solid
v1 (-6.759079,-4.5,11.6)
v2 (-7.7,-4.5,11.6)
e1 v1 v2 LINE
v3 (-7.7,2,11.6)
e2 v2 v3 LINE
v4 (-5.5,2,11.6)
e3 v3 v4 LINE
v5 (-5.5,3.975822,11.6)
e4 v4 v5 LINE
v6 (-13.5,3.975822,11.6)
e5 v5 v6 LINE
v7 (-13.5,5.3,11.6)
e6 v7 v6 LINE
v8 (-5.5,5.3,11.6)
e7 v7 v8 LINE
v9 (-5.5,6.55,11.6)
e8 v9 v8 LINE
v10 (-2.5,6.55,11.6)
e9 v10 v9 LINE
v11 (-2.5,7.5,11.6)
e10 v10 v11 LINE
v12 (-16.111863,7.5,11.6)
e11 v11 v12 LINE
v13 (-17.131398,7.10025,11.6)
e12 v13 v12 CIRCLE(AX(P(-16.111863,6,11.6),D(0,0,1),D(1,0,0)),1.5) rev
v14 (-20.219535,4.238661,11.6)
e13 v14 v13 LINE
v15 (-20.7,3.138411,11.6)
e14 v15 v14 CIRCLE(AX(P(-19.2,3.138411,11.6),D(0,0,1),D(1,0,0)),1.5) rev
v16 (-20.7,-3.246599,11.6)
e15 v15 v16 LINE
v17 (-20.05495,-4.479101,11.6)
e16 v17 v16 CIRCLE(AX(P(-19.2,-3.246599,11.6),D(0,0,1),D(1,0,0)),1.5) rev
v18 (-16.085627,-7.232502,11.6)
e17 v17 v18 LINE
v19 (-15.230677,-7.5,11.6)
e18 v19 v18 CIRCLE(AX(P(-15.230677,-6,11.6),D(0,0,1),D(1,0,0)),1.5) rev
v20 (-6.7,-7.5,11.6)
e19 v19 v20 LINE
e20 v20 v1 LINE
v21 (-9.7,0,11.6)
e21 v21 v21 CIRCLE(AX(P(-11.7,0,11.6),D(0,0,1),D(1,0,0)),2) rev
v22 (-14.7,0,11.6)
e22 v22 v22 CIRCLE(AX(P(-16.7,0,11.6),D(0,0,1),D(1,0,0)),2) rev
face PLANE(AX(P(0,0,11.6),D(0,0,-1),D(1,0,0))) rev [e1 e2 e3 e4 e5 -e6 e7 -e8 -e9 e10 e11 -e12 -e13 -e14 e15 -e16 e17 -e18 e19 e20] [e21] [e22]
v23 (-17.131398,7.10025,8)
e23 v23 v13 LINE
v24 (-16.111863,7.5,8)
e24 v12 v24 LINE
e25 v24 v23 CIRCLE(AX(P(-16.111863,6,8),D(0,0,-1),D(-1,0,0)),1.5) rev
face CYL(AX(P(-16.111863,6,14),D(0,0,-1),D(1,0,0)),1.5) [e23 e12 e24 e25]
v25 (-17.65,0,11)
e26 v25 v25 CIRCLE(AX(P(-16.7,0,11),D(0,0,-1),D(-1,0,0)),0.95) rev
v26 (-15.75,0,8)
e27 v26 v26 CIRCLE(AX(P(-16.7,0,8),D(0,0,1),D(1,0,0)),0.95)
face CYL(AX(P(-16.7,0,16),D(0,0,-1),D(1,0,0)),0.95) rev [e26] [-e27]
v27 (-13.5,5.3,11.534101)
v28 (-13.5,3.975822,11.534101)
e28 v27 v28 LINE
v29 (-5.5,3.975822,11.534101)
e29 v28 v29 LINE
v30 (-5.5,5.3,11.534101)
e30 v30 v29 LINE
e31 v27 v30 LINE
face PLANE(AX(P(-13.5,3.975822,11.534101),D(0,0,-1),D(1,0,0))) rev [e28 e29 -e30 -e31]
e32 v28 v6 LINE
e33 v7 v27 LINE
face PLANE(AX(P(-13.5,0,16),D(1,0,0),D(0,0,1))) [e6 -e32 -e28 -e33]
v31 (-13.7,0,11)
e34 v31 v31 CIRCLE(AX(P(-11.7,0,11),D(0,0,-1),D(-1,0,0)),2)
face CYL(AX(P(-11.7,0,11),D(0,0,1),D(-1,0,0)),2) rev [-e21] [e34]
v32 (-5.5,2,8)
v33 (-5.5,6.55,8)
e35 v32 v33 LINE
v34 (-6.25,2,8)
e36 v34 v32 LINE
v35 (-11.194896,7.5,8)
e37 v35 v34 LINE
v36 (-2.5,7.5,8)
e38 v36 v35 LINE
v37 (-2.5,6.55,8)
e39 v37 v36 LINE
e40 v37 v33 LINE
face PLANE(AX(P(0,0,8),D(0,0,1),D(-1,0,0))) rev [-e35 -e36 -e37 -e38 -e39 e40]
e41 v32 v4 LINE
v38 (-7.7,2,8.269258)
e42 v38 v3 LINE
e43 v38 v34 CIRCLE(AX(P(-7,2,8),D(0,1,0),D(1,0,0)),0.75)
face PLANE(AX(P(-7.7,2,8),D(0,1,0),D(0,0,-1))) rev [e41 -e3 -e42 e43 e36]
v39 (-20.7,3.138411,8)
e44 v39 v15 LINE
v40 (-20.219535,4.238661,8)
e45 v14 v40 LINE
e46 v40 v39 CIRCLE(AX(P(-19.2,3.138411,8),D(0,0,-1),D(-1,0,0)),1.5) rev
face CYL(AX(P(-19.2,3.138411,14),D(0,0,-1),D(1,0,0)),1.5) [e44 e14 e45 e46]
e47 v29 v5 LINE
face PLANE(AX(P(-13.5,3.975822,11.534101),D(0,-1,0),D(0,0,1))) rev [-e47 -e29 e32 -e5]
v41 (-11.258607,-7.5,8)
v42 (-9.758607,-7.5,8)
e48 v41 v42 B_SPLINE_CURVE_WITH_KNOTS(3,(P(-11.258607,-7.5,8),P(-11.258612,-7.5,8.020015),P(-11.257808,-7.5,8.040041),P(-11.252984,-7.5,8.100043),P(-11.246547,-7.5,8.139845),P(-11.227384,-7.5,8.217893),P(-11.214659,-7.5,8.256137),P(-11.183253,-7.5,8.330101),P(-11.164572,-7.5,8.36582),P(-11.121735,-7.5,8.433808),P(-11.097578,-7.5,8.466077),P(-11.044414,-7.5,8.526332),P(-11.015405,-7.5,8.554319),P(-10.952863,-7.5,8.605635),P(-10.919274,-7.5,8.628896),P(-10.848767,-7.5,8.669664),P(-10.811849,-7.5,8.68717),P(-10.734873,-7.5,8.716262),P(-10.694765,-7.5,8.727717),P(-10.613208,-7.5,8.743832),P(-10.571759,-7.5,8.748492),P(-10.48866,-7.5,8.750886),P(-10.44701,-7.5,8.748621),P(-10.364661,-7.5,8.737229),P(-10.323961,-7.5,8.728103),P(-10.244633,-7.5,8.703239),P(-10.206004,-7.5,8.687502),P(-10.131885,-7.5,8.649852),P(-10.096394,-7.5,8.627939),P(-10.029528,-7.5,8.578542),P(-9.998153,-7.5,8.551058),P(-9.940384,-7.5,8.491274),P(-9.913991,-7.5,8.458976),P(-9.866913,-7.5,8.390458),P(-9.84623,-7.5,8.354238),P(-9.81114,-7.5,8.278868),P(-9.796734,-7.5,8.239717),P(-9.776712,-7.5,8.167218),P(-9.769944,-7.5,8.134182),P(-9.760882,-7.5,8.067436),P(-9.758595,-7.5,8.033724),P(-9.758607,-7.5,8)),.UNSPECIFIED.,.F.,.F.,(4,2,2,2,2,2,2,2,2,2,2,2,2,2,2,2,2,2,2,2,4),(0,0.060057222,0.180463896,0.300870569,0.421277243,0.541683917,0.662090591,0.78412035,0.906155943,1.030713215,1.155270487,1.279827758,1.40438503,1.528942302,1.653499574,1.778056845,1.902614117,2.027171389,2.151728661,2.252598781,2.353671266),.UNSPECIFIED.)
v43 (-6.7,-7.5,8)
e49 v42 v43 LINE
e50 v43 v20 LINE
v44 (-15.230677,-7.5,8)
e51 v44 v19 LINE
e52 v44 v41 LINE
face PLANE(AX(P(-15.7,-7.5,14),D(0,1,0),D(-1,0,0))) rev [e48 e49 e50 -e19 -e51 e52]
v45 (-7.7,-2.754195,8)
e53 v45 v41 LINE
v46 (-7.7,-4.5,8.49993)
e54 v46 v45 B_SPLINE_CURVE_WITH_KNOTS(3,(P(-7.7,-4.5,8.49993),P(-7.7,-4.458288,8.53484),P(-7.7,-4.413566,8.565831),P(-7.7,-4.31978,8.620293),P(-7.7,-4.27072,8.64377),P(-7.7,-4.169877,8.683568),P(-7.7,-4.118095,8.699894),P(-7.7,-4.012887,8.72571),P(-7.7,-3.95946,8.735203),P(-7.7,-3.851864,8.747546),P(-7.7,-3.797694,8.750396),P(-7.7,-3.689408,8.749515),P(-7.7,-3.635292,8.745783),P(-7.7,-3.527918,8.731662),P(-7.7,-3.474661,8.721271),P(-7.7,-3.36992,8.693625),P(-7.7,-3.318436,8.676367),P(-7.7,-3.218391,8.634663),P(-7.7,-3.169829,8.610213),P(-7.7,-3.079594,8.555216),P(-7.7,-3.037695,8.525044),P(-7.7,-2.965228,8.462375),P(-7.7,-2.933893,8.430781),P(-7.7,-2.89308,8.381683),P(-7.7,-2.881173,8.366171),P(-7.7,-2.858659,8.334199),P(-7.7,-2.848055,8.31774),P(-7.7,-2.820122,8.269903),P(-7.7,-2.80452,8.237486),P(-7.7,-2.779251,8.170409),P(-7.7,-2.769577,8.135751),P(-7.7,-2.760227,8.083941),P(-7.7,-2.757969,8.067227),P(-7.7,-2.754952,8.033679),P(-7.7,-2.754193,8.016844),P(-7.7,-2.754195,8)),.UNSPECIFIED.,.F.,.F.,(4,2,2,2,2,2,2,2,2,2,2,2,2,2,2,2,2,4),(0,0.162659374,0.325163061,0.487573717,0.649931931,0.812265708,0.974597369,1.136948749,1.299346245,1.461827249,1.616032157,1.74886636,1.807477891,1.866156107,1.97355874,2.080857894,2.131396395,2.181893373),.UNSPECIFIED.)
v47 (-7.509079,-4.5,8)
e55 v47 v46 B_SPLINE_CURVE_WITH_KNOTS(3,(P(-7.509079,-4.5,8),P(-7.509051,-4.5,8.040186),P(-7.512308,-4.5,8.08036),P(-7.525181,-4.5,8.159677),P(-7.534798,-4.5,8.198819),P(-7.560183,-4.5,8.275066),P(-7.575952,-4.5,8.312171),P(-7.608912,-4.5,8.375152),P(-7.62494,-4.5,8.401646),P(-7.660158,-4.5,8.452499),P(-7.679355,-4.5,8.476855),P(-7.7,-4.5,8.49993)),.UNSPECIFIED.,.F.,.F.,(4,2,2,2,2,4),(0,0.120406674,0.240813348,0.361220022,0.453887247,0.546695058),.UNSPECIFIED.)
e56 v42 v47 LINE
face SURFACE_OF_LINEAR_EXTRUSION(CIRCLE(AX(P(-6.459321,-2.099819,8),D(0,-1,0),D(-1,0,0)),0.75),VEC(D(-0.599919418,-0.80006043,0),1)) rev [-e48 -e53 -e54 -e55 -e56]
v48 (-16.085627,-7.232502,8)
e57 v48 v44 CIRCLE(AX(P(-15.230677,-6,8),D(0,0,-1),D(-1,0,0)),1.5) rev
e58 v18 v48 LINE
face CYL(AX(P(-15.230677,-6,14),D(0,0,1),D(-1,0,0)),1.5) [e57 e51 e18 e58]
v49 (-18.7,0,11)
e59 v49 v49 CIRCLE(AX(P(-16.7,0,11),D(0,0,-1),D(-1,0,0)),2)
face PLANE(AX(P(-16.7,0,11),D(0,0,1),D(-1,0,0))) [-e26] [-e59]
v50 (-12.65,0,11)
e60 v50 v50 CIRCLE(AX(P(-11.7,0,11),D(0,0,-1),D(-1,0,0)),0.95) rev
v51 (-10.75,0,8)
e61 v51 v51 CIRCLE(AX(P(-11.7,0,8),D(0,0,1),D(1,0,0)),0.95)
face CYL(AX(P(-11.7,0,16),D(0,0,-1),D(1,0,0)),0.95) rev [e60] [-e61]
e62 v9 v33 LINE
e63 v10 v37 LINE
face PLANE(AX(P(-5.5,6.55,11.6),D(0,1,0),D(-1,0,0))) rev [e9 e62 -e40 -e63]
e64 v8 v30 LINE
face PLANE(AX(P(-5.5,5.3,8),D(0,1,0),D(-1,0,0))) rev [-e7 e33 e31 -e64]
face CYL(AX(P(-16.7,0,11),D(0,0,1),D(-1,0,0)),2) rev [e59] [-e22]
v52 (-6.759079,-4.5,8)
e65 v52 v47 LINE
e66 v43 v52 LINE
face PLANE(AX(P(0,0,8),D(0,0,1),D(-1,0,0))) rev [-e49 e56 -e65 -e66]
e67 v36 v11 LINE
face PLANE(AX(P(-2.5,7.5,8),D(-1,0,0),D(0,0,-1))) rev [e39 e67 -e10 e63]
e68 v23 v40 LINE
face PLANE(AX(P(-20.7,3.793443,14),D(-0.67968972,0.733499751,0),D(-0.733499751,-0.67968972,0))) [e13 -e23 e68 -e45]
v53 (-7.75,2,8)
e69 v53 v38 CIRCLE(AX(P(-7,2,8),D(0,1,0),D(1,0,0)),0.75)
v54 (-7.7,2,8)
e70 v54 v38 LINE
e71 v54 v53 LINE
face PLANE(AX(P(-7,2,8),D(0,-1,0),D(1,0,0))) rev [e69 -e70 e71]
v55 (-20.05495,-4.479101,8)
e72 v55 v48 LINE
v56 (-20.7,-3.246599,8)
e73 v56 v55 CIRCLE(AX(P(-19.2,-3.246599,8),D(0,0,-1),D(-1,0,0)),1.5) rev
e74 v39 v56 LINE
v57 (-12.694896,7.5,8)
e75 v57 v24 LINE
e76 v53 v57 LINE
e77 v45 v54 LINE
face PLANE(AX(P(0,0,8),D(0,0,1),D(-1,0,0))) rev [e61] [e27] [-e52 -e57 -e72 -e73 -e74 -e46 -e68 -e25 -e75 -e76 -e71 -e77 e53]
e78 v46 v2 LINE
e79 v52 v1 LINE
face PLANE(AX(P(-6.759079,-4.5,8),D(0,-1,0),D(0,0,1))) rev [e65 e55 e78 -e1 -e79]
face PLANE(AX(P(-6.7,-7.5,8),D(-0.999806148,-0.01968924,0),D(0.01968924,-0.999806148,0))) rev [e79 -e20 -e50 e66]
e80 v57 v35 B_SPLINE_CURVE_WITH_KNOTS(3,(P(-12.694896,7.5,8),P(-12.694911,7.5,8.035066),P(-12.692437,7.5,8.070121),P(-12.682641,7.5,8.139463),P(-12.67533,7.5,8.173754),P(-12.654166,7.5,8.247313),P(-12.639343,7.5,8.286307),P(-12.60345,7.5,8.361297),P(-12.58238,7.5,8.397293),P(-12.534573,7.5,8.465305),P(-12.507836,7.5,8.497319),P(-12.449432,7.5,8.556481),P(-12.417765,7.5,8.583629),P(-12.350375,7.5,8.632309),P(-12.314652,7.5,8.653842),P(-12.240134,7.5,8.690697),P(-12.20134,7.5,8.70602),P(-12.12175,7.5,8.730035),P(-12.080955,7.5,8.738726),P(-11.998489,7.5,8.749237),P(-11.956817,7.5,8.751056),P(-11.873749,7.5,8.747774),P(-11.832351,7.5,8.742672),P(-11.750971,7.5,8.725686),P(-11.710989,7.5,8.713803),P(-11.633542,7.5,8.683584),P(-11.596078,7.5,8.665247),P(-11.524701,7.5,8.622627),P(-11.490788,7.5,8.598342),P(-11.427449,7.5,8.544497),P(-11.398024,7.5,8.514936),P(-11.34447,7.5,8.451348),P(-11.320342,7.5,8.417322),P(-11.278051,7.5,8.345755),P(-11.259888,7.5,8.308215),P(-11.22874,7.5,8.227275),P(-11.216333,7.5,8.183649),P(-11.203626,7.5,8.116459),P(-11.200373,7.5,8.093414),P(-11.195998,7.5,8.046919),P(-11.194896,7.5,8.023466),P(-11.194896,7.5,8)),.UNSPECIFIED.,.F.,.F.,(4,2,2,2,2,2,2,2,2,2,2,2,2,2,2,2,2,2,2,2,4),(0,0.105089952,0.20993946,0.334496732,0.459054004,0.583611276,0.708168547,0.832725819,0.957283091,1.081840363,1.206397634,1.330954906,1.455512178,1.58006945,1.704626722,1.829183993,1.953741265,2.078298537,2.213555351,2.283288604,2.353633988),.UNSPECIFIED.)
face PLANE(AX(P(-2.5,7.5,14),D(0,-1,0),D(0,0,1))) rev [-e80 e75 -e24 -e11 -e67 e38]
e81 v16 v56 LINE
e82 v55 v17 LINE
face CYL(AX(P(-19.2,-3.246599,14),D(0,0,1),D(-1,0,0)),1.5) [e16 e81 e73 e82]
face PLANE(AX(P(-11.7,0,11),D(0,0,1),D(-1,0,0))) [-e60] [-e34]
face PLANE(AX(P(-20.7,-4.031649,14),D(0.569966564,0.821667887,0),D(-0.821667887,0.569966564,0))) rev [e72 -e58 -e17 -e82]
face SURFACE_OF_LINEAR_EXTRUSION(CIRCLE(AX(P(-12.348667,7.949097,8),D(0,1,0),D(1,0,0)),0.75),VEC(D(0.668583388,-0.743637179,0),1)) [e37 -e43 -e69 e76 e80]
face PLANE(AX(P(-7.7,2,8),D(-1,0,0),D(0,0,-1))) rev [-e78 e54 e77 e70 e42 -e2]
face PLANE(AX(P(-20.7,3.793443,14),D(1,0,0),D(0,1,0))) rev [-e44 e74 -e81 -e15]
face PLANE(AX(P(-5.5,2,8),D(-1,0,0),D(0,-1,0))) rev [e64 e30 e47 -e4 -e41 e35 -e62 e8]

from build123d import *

# Parameters (mm, degrees)
BOSS_EXTRUDE1_DEPTH      = 2
BOSS_EXTRUDE2_DEPTH      = 6
SKETCH24_R               = 3.9
BOSS_EXTRUDE5_DEPTH      = 2.3
SKETCH30_W               = 2.408612022
SKETCH30_H               = 1.324178481
CUT_EXTRUDE12_DEPTH      = 8
CUT_EXTRUDE11_DEPTH      = 23.432788503
FILLET1_R                = 1.5
SKETCH34_R               = 0.75
CUT_EXTRUDE13_DEPTH      = 8
SKETCH35_R               = 0.75
CUT_EXTRUDE14_DEPTH      = 3
CUT_EXTRUDE14_DEPTH_BACK = 8
SKETCH36_R               = 0.95
CUT_EXTRUDE15_DEPTH      = 8
SKETCH37_R               = 2
CUT_EXTRUDE16_DEPTH      = 5
SKETCH38_W               = 3
SKETCH38_H               = 1.25
CUT_EXTRUDE17_DEPTH      = 3.6


with BuildPart() as part:
    # Sketch2 → Boss-Extrude1 (new body)
    with BuildSketch(Plane.XY):
        with BuildLine():
            Line((-2.5, 7.5), (-16.7, 7.5))
            Line((-16.7, 7.5), (-20.7, 3.793442666))
            Line((-20.7, 3.793442666), (-20.7, -4.031648778))
            Line((-20.7, -4.031648778), (-15.7, -7.5))
            Line((-15.7, -7.5), (-6.7, -7.5))
            Line((-6.7, -7.5), (-4.2, -5.6))
            ThreePointArc((-4.2, -5.6), (3.130495168, -6.260990337), (7, 0))
            ThreePointArc((7, 0), (4.949747468, 4.949747468), (0, 7))
            Line((0, 7), (0, 7.5))
            Line((0, 7.5), (-2.5, 7.5))
        make_face()
    extrude(amount=BOSS_EXTRUDE1_DEPTH)

    # Sketch4 → Boss-Extrude2 (add)
    with BuildSketch(Plane.XY.offset(2)):
        Polygon((-15.7, -7.5), (-6.7, -7.5), (-6.759079174, -4.5), (-7.7, -4.5), (-7.7, 2), (-5.5, 2), (-5.5, 5.3), (-2.5, 5.3), (-2.5, 7.5), (-16.7, 7.5), (-20.7, 3.793442666), (-20.7, -4.031648778), align=None)
    extrude(amount=BOSS_EXTRUDE2_DEPTH)

    # Sketch24 → Boss-Extrude5 (add)
    with BuildSketch(Plane.XY.offset(2)):
        Circle(SKETCH24_R)
    extrude(amount=BOSS_EXTRUDE5_DEPTH)

    # Sketch30 → Cut-Extrude12 (cut)
    with BuildSketch(Plane(origin=(-5.5, 0, 0), x_dir=(0, 0, -1), z_dir=(1, 0, 0))):
        with Locations((-3.261593395, 4.63791076)):
            Rectangle(SKETCH30_W, SKETCH30_H)
    extrude(amount=-CUT_EXTRUDE12_DEPTH, mode=Mode.SUBTRACT)

    # Sketch28 → Cut-Extrude11 (cut, through all)
    with BuildSketch(Plane.XY.offset(4.3)):
        with BuildLine():
            Line((-1, 1.732050808), (-1, -1.732050808))
            ThreePointArc((-1, -1.732050808), (2, 0), (-1, 1.732050808))
        make_face()
    extrude(amount=-CUT_EXTRUDE11_DEPTH, mode=Mode.SUBTRACT)

    # Fillet1
    fillet1_edges = [part.edges().sort_by_distance(p)[0] for p in [
        (-11.2, -7.5, 0),
        (-8.35, 7.5, 0),
        (-18.7, 5.646721333, 0),
        (-18.2, -5.765824389, 0),
        (-20.7, -0.119103056, 0),
        (-15.7, -7.5, 4),
        (-20.7, -4.031648778, 4),
        (-20.7, 3.793442666, 4),
        (-16.7, 7.5, 4),
    ]]
    fillet(fillet1_edges, radius=FILLET1_R)

    # Sketch34 → Cut-Extrude13 (cut, along a direction that is not the sketch's normal)
    with BuildSketch(Plane.XZ.offset(-2)):
        with Locations((-7, 8)):
            Circle(SKETCH34_R)
    extrude(amount=-CUT_EXTRUDE13_DEPTH, dir=(0.6685833876565112, -0.7436371788377336, 0), mode=Mode.SUBTRACT)

    # Sketch35 → Cut-Extrude14 (cut, two sides, along a direction that is not the sketch's normal)
    with BuildSketch(Plane(origin=(0, -4.5, 0), x_dir=(1, 0, 0), z_dir=(0, 1, 0))) as cut_extrude14_sk:
        with Locations((-8.259079174, -8)):
            Circle(SKETCH35_R)
    extrude(amount=CUT_EXTRUDE14_DEPTH, dir=(0.5999194182208608, 0.8000604299935998, 0), mode=Mode.SUBTRACT)
    extrude(cut_extrude14_sk.sketch, amount=-CUT_EXTRUDE14_DEPTH_BACK, dir=(0.5999194182208608, 0.8000604299935998, 0), mode=Mode.SUBTRACT)

    # Sketch36 → Cut-Extrude15 (cut)
    with BuildSketch(Plane.XY.offset(8)):
        with Locations((-11.7, 0)):
            Circle(SKETCH36_R)
        with Locations((-16.7, 0)):
            Circle(SKETCH36_R)
    extrude(amount=-CUT_EXTRUDE15_DEPTH, mode=Mode.SUBTRACT)

    # Sketch37 → Cut-Extrude16 (cut)
    with BuildSketch(Plane(origin=(0, 0, 0), x_dir=(-1, 0, 0), z_dir=(0, 0, -1))):
        with Locations((11.7, 0)):
            Circle(SKETCH37_R)
        with Locations((16.7, 0)):
            Circle(SKETCH37_R)
    extrude(amount=-CUT_EXTRUDE16_DEPTH, mode=Mode.SUBTRACT)

    # Sketch38 → Cut-Extrude17 (cut)
    with BuildSketch(Plane.XY.offset(8)):
        with Locations((-4, 5.925)):
            Rectangle(SKETCH38_W, SKETCH38_H)
    extrude(amount=-CUT_EXTRUDE17_DEPTH, mode=Mode.SUBTRACT)


with BuildPart() as body_2:
    # Split2: the piece on the far side of the plane
    add(part.part)
    split(bisect_by=Plane.XY.offset(4.4), keep=Keep.BOTTOM)


with BuildPart() as part_1:
    add(part.part)

    # Split2
    split(bisect_by=Plane.XY.offset(4.4), keep=Keep.TOP)


with BuildPart() as body_3:
    # Mirror2: read off the stored shape, not the designer's step
    # Mirror2: mirrored copy
    add(part_1.part.mirror(Plane.XY.offset(8)))


solid = body_3.part
